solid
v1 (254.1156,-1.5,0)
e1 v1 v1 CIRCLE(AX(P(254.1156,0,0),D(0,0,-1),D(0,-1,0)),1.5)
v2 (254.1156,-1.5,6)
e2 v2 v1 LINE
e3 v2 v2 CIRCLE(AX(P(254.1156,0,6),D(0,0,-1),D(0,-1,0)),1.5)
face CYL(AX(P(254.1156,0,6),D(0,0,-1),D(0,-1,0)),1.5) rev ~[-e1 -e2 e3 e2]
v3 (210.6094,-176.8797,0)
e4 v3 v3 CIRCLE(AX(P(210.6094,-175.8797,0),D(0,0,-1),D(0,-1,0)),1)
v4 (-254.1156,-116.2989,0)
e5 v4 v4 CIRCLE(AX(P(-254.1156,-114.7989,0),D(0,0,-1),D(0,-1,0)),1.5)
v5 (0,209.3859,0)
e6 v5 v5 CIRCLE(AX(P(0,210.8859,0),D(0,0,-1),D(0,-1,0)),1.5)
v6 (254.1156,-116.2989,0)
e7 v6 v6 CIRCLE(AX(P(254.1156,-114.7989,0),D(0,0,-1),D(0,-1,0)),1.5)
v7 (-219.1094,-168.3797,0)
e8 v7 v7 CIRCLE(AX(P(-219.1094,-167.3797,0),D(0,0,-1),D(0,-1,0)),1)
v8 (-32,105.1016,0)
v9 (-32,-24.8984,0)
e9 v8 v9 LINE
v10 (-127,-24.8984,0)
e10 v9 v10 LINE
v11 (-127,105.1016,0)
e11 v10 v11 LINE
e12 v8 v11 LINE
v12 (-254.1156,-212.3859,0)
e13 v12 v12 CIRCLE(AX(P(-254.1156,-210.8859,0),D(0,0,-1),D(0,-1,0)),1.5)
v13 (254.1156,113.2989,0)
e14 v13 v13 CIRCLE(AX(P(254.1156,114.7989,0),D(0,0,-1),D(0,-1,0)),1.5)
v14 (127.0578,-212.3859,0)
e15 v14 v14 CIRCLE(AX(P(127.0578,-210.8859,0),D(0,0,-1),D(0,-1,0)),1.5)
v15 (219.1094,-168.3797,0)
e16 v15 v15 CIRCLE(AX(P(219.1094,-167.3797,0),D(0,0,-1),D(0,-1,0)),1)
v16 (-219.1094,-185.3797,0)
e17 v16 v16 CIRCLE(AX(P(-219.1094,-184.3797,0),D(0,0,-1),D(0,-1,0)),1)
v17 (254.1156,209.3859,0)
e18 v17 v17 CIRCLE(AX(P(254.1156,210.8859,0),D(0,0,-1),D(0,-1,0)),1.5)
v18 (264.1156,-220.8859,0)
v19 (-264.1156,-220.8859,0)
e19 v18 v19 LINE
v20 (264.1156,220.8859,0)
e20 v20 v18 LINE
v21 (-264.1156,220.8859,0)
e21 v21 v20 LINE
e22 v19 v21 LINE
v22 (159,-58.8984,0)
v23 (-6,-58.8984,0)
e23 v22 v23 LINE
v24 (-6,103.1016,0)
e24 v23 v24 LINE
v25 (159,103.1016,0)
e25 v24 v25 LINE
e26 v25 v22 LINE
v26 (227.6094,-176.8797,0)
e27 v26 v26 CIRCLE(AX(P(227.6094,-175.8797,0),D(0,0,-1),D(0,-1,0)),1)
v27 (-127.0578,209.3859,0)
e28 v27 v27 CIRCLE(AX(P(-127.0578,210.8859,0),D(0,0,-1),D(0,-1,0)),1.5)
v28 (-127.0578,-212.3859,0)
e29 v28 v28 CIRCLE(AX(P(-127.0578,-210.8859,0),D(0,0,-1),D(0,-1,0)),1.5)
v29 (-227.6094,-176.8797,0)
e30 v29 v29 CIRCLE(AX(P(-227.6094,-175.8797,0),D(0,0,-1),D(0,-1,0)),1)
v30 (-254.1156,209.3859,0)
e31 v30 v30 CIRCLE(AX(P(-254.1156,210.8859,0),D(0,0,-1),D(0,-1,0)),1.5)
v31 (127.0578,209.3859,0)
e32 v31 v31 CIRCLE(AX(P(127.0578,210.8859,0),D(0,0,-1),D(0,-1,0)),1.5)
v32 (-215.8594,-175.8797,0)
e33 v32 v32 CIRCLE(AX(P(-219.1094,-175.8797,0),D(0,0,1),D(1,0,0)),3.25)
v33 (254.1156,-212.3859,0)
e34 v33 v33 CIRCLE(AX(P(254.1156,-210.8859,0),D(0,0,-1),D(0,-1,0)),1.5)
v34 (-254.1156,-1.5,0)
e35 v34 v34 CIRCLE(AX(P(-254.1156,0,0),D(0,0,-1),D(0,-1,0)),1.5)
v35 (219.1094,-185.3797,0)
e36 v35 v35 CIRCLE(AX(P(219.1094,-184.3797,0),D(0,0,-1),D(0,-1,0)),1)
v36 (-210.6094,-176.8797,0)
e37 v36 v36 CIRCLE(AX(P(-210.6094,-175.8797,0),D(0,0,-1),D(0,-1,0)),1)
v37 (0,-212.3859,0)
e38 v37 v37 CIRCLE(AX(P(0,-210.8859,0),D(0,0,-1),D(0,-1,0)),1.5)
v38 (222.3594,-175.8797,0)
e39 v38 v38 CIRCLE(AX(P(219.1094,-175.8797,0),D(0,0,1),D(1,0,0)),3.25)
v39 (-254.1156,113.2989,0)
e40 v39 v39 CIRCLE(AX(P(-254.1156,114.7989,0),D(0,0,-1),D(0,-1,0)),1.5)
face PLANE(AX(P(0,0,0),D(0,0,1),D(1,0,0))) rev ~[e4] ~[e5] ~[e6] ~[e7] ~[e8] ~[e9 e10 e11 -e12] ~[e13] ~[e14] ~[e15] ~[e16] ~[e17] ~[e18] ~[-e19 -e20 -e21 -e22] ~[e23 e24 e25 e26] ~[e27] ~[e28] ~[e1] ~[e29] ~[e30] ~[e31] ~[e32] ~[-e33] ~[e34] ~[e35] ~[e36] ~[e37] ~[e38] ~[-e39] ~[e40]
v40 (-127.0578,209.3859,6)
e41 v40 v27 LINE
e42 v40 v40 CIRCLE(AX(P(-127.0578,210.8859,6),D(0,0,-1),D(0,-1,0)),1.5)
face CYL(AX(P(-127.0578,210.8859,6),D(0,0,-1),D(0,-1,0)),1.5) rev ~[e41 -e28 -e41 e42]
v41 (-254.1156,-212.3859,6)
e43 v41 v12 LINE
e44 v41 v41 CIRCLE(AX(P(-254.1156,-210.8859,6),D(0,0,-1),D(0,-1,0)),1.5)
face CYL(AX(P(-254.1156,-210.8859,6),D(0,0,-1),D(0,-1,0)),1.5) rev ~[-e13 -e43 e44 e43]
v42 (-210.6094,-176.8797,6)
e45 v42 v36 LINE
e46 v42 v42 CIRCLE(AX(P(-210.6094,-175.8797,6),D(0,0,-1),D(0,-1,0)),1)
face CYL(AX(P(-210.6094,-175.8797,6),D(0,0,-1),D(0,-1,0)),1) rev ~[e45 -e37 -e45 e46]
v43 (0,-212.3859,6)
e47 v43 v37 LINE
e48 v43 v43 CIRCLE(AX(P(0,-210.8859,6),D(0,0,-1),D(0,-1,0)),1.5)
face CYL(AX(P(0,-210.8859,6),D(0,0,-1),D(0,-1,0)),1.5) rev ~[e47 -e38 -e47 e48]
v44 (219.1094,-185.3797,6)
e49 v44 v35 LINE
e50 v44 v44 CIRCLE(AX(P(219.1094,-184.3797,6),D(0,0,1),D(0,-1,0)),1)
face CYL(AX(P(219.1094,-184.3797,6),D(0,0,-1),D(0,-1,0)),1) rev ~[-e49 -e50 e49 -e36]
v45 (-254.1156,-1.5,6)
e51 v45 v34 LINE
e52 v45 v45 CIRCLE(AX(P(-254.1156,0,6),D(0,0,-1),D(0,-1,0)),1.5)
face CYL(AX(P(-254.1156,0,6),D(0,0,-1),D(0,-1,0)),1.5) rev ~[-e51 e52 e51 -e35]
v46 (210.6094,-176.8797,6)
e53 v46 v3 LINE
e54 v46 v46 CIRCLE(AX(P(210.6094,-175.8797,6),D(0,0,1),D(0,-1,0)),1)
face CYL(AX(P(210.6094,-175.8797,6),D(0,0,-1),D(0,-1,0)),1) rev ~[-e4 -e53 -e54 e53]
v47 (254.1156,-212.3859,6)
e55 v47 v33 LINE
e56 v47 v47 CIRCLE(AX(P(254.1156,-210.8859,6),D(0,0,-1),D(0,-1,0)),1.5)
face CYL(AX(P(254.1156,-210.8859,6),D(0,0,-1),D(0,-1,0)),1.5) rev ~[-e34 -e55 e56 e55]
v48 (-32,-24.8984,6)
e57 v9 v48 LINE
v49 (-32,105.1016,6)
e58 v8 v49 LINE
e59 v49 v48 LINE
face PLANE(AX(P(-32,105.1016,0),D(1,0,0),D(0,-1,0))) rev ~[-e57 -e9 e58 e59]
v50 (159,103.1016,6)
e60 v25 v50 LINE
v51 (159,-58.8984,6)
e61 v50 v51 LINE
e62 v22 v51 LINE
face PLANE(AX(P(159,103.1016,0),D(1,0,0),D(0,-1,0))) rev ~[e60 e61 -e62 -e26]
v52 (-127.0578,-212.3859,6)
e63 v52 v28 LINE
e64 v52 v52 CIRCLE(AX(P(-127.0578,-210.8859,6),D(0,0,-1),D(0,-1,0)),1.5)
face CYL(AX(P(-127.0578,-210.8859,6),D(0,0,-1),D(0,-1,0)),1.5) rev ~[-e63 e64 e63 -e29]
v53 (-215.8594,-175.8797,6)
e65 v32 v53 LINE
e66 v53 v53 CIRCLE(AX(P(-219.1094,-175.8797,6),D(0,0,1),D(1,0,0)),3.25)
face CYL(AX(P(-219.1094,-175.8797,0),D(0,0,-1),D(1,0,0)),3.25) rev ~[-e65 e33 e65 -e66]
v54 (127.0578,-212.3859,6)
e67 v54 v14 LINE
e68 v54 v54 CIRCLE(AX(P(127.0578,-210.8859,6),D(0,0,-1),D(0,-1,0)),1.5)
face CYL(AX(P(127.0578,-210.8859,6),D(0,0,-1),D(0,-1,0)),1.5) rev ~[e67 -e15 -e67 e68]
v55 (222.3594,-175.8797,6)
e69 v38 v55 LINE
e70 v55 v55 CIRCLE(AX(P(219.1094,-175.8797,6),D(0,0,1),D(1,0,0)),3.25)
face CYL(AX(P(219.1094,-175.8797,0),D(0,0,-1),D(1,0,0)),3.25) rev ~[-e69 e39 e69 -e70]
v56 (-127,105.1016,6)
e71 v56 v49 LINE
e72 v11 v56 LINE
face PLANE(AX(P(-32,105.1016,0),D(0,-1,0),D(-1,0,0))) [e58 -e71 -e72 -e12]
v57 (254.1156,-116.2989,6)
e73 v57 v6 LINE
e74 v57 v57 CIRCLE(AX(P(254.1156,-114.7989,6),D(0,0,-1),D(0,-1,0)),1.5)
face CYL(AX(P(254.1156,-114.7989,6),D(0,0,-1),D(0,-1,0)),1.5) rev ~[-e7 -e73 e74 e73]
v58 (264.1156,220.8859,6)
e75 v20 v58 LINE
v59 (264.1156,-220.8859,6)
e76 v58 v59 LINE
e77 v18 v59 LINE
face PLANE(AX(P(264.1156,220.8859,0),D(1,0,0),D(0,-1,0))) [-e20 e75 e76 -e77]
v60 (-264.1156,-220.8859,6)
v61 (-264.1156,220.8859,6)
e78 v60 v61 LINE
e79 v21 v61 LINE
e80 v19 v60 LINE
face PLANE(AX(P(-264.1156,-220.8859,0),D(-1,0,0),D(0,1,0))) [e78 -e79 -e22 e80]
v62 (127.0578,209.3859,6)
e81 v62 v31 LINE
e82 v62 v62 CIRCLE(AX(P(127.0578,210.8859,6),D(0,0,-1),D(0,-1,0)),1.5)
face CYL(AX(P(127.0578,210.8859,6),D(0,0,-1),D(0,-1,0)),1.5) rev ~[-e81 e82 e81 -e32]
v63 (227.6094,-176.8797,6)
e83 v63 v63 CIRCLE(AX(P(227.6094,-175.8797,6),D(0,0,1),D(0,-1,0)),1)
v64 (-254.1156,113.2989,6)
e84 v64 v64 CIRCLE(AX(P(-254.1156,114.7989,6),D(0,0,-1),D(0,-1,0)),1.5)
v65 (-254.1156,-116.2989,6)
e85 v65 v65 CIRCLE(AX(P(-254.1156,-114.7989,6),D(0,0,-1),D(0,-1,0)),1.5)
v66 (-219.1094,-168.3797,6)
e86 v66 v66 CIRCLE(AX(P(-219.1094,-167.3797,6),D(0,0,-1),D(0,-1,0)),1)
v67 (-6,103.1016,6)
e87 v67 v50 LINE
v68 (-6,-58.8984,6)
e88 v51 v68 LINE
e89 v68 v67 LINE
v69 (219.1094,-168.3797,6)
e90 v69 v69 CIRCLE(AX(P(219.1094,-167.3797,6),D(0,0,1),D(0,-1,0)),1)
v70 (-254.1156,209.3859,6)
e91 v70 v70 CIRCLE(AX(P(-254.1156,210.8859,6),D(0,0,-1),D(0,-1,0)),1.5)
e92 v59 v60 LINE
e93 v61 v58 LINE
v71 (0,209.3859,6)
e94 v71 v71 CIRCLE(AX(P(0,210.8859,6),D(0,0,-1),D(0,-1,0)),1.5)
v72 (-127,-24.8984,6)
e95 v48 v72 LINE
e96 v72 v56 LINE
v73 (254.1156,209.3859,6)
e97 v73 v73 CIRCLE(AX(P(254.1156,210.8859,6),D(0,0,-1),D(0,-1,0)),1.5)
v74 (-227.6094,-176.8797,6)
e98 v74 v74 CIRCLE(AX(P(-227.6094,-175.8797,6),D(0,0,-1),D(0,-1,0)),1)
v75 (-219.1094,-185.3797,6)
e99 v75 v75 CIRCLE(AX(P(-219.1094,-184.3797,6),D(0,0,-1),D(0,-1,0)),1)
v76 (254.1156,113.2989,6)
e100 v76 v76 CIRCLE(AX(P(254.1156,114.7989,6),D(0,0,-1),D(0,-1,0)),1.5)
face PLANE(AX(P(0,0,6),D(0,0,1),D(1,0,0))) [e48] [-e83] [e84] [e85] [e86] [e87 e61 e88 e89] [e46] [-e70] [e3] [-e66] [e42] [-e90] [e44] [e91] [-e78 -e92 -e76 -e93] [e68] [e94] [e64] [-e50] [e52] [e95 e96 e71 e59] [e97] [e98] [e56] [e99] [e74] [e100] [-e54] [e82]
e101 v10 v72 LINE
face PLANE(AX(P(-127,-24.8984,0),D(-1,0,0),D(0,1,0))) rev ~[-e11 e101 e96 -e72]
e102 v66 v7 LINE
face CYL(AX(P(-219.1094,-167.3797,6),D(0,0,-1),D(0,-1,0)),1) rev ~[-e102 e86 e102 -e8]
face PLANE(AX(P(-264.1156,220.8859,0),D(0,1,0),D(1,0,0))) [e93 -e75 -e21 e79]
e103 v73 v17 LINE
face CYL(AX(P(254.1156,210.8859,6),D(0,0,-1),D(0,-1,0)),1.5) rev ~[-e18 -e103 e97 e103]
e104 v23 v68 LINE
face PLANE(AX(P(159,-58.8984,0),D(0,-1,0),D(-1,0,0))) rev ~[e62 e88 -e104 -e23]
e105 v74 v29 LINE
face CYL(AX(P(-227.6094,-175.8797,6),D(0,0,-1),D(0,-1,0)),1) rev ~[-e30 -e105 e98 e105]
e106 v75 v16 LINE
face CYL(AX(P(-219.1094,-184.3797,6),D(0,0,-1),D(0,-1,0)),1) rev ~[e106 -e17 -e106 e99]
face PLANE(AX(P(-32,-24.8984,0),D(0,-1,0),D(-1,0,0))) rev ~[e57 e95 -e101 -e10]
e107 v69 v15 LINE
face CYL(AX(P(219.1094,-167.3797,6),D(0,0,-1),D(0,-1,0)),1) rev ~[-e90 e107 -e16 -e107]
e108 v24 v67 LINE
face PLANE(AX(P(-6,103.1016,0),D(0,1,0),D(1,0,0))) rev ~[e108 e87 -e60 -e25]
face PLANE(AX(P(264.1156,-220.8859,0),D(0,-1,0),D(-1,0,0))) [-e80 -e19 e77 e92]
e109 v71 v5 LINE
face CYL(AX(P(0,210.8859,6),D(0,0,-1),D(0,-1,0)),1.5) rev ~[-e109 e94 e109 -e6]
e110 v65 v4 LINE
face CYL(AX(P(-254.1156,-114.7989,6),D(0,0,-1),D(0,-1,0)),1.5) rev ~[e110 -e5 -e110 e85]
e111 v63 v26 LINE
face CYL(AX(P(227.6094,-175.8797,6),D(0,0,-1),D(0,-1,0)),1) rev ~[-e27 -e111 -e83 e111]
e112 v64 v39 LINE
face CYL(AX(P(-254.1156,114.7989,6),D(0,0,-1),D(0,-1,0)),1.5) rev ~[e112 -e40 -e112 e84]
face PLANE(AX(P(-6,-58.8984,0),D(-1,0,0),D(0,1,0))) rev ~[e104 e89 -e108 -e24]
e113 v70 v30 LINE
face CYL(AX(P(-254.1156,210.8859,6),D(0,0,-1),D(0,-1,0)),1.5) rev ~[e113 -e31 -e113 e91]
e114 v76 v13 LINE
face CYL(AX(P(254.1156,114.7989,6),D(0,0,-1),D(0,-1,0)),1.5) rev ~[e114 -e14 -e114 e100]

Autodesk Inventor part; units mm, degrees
ref_plane "YZ Plane" through (0, 0, 0) normal (1, 0, 0) x (0, 1, 0)
ref_plane "XZ Plane" through (0, 0, 0) normal (0, 1, 0) x (-1, 0, 0)
ref_plane "XY Plane" through (0, 0, 0) normal (0, 0, 1) x (1, 0, 0)
sketch "Sketch1" plane through (0, 0, 0) normal (0, 0, 1) x (1, 0, 0)
  line L0 (-264.1156, 220.8859) -> (264.1156, 220.8859) projected
  line L1 (-264.1156, -220.8859) -> (-264.1156, 220.8859) projected
  line L2 (264.1156, -220.8859) -> (-264.1156, -220.8859) projected
  line L3 (264.1156, 220.8859) -> (264.1156, -220.8859) projected
  line L4 (-207, 203.1016) -> (-207, -132.8984) construction
  line L5 (207, 203.1016) -> (-207, 203.1016) construction
  line L6 (207, -132.8984) -> (207, 203.1016) construction
  line L7 (-207, -132.8984) -> (207, -132.8984) construction
  circle A0 centre (-219.1094, -175.8797) radius 9.5 construction
  circle A1 centre (219.1094, -175.8797) radius 9.5 construction
  circle A2 centre (-219.1094, -175.8797) radius 3.25
  circle A3 centre (219.1094, -175.8797) radius 3.25
  line L8 (-137, 115.1016) -> (169, 115.1016)
  line L9 (169, 115.1016) -> (169, -115.5443)
  line L10 (169, -115.5443) -> (-137, -115.5443)
  line L11 (-137, -115.5443) -> (-137, 115.1016)
  line L12 (159, 103.1016) -> (159, -58.8984) projected
  line L13 (-127, -24.8984) -> (-127, 105.1016) projected
  line L14 (-32, 105.1016) -> (-115, 105.1016) projected
  line L15 (159, 103.1016) -> (159, -58.8984) projected
  line L16 (159, -58.8984) -> (-6, -58.8984) projected
  line L17 (-6, -58.8984) -> (-6, 103.1016) projected
  line L18 (-6, 103.1016) -> (159, 103.1016) projected
  line L19 (-32, 105.1016) -> (-32, -24.8984) projected
  line L20 (-32, -24.8984) -> (-127, -24.8984) projected
  line L21 (-127, -24.8984) -> (-127, 105.1016) projected
  line L22 (-127, 105.1016) -> (-32, 105.1016) projected
  line L23 (199, 195.1016) -> (-199, 195.1016) projected
  line L24 (-199, 195.1016) -> (-199, -130.8984) projected
  line L25 (-199, -130.8984) -> (199, -130.8984) projected
  line L26 (199, -130.8984) -> (199, 195.1016) projected
  circle A4 centre (-254.1156, -114.7989) radius 1 projected
  circle A5 centre (-254.1156, -210.8859) radius 1 projected
  circle A6 centre (-127.0578, -210.8859) radius 1 projected
  circle A7 centre (254.1156, -114.7989) radius 1 projected
  circle A8 centre (254.1156, -210.8859) radius 1 projected
  circle A9 centre (0, -210.8859) radius 1 projected
  circle A10 centre (127.0578, -210.8859) radius 1 projected
  circle A11 centre (-254.1156, 114.7989) radius 1 projected
  circle A12 centre (-254.1156, 0) radius 1 projected
  circle A13 centre (-254.1156, 210.8859) radius 1 projected
  circle A14 centre (-127.0578, 210.8859) radius 1 projected
  circle A15 centre (254.1156, 114.7989) radius 1 projected
  circle A16 centre (127.0578, 210.8859) radius 1 projected
  circle A17 centre (0, 210.8859) radius 1 projected
  circle A18 centre (254.1156, 210.8859) radius 1 projected
  circle A19 centre (254.1156, 0) radius 1 projected
  point P0 (0, 0)
  dimension "d0" = 6.5
  dimension "d1" = 6.5
  dimension "d2" = 10
  dimension "d3" = 10
  dimension "d4" = 10
extrude "Extrusion1" add sketch "Sketch1" along normal blind 6 contours L0 L3 L2 L1 | L8 L9 L10 L11 | L26 L25 L24 L23 | A4 | A5 | A6 | A7 | A8 | A9 | A10 | A11 | A12 | A13 | A14 | A15 | A16 | A17 | A18 | A19
sketch "Sketch2" plane through (0, 0, 6) normal (0, 0, 1) x (1, 0, 0)
  circle A0 centre (-219.1094, -175.8797) radius 3.25 construction
  circle A1 centre (-219.1094, -175.8797) radius 8.5 construction
  point P0 (0, 0)
  point P1 (-219.1094, -167.3797)
  point P2 (-227.6094, -175.8797)
  point P3 (-210.6094, -175.8797)
  point P4 (-219.1094, -184.3797)
  dimension "d7" = 17
hole "Hole1" at (-219.1094, -167.3797, 6) at (-227.6094, -175.8797, 6) at (-210.6094, -175.8797, 6) at (-219.1094, -184.3797, 6) direction (0, 0, -1) diameter 2 end through all
mirror "Mirror1" about plane through (0, 0, 0) normal (1, 0, 0) of "Hole1"
sketch "Sketch3" plane through (0, 0, 6) normal (0, 0, 1) x (1, 0, 0)
  circle A0 centre (-254.1156, 210.8859) radius 1 projected
  circle A1 centre (-127.0578, 210.8859) radius 1 projected
  circle A2 centre (0, 210.8859) radius 1 projected
  circle A3 centre (-254.1156, 114.7989) radius 1 projected
  circle A4 centre (-254.1156, 0) radius 1 projected
  circle A5 centre (127.0578, 210.8859) radius 1 projected
  circle A6 centre (254.1156, 210.8859) radius 1 projected
  circle A7 centre (254.1156, 114.7989) radius 1 projected
  circle A8 centre (254.1156, 0) radius 1 projected
  circle A9 centre (254.1156, -114.7989) radius 1 projected
  circle A10 centre (254.1156, -210.8859) radius 1 projected
  circle A11 centre (127.0578, -210.8859) radius 1 projected
  circle A12 centre (0, -210.8859) radius 1 projected
  circle A13 centre (-127.0578, -210.8859) radius 1 projected
  circle A14 centre (-254.1156, -210.8859) radius 1 projected
  circle A15 centre (-254.1156, -114.7989) radius 1 projected
  point P0 (0, 0)
hole "Hole2" at (-254.1156, 210.8859, 6) at (-127.0578, 210.8859, 6) at (0, 210.8859, 6) at (127.0578, 210.8859, 6) at (254.1156, 210.8859, 6) at (254.1156, 114.7989, 6) at (254.1156, 0, 6) at (254.1156, -114.7989, 6) at (254.1156, -210.8859, 6) at (127.0578, -210.8859, 6) at (0, -210.8859, 6) at (-127.0578, -210.8859, 6) at (-254.1156, -210.8859, 6) at (-254.1156, -114.7989, 6) at (-254.1156, 0, 6) at (-254.1156, 114.7989, 6) direction (0, 0, -1) diameter 3 end through all
properties part number "back"
